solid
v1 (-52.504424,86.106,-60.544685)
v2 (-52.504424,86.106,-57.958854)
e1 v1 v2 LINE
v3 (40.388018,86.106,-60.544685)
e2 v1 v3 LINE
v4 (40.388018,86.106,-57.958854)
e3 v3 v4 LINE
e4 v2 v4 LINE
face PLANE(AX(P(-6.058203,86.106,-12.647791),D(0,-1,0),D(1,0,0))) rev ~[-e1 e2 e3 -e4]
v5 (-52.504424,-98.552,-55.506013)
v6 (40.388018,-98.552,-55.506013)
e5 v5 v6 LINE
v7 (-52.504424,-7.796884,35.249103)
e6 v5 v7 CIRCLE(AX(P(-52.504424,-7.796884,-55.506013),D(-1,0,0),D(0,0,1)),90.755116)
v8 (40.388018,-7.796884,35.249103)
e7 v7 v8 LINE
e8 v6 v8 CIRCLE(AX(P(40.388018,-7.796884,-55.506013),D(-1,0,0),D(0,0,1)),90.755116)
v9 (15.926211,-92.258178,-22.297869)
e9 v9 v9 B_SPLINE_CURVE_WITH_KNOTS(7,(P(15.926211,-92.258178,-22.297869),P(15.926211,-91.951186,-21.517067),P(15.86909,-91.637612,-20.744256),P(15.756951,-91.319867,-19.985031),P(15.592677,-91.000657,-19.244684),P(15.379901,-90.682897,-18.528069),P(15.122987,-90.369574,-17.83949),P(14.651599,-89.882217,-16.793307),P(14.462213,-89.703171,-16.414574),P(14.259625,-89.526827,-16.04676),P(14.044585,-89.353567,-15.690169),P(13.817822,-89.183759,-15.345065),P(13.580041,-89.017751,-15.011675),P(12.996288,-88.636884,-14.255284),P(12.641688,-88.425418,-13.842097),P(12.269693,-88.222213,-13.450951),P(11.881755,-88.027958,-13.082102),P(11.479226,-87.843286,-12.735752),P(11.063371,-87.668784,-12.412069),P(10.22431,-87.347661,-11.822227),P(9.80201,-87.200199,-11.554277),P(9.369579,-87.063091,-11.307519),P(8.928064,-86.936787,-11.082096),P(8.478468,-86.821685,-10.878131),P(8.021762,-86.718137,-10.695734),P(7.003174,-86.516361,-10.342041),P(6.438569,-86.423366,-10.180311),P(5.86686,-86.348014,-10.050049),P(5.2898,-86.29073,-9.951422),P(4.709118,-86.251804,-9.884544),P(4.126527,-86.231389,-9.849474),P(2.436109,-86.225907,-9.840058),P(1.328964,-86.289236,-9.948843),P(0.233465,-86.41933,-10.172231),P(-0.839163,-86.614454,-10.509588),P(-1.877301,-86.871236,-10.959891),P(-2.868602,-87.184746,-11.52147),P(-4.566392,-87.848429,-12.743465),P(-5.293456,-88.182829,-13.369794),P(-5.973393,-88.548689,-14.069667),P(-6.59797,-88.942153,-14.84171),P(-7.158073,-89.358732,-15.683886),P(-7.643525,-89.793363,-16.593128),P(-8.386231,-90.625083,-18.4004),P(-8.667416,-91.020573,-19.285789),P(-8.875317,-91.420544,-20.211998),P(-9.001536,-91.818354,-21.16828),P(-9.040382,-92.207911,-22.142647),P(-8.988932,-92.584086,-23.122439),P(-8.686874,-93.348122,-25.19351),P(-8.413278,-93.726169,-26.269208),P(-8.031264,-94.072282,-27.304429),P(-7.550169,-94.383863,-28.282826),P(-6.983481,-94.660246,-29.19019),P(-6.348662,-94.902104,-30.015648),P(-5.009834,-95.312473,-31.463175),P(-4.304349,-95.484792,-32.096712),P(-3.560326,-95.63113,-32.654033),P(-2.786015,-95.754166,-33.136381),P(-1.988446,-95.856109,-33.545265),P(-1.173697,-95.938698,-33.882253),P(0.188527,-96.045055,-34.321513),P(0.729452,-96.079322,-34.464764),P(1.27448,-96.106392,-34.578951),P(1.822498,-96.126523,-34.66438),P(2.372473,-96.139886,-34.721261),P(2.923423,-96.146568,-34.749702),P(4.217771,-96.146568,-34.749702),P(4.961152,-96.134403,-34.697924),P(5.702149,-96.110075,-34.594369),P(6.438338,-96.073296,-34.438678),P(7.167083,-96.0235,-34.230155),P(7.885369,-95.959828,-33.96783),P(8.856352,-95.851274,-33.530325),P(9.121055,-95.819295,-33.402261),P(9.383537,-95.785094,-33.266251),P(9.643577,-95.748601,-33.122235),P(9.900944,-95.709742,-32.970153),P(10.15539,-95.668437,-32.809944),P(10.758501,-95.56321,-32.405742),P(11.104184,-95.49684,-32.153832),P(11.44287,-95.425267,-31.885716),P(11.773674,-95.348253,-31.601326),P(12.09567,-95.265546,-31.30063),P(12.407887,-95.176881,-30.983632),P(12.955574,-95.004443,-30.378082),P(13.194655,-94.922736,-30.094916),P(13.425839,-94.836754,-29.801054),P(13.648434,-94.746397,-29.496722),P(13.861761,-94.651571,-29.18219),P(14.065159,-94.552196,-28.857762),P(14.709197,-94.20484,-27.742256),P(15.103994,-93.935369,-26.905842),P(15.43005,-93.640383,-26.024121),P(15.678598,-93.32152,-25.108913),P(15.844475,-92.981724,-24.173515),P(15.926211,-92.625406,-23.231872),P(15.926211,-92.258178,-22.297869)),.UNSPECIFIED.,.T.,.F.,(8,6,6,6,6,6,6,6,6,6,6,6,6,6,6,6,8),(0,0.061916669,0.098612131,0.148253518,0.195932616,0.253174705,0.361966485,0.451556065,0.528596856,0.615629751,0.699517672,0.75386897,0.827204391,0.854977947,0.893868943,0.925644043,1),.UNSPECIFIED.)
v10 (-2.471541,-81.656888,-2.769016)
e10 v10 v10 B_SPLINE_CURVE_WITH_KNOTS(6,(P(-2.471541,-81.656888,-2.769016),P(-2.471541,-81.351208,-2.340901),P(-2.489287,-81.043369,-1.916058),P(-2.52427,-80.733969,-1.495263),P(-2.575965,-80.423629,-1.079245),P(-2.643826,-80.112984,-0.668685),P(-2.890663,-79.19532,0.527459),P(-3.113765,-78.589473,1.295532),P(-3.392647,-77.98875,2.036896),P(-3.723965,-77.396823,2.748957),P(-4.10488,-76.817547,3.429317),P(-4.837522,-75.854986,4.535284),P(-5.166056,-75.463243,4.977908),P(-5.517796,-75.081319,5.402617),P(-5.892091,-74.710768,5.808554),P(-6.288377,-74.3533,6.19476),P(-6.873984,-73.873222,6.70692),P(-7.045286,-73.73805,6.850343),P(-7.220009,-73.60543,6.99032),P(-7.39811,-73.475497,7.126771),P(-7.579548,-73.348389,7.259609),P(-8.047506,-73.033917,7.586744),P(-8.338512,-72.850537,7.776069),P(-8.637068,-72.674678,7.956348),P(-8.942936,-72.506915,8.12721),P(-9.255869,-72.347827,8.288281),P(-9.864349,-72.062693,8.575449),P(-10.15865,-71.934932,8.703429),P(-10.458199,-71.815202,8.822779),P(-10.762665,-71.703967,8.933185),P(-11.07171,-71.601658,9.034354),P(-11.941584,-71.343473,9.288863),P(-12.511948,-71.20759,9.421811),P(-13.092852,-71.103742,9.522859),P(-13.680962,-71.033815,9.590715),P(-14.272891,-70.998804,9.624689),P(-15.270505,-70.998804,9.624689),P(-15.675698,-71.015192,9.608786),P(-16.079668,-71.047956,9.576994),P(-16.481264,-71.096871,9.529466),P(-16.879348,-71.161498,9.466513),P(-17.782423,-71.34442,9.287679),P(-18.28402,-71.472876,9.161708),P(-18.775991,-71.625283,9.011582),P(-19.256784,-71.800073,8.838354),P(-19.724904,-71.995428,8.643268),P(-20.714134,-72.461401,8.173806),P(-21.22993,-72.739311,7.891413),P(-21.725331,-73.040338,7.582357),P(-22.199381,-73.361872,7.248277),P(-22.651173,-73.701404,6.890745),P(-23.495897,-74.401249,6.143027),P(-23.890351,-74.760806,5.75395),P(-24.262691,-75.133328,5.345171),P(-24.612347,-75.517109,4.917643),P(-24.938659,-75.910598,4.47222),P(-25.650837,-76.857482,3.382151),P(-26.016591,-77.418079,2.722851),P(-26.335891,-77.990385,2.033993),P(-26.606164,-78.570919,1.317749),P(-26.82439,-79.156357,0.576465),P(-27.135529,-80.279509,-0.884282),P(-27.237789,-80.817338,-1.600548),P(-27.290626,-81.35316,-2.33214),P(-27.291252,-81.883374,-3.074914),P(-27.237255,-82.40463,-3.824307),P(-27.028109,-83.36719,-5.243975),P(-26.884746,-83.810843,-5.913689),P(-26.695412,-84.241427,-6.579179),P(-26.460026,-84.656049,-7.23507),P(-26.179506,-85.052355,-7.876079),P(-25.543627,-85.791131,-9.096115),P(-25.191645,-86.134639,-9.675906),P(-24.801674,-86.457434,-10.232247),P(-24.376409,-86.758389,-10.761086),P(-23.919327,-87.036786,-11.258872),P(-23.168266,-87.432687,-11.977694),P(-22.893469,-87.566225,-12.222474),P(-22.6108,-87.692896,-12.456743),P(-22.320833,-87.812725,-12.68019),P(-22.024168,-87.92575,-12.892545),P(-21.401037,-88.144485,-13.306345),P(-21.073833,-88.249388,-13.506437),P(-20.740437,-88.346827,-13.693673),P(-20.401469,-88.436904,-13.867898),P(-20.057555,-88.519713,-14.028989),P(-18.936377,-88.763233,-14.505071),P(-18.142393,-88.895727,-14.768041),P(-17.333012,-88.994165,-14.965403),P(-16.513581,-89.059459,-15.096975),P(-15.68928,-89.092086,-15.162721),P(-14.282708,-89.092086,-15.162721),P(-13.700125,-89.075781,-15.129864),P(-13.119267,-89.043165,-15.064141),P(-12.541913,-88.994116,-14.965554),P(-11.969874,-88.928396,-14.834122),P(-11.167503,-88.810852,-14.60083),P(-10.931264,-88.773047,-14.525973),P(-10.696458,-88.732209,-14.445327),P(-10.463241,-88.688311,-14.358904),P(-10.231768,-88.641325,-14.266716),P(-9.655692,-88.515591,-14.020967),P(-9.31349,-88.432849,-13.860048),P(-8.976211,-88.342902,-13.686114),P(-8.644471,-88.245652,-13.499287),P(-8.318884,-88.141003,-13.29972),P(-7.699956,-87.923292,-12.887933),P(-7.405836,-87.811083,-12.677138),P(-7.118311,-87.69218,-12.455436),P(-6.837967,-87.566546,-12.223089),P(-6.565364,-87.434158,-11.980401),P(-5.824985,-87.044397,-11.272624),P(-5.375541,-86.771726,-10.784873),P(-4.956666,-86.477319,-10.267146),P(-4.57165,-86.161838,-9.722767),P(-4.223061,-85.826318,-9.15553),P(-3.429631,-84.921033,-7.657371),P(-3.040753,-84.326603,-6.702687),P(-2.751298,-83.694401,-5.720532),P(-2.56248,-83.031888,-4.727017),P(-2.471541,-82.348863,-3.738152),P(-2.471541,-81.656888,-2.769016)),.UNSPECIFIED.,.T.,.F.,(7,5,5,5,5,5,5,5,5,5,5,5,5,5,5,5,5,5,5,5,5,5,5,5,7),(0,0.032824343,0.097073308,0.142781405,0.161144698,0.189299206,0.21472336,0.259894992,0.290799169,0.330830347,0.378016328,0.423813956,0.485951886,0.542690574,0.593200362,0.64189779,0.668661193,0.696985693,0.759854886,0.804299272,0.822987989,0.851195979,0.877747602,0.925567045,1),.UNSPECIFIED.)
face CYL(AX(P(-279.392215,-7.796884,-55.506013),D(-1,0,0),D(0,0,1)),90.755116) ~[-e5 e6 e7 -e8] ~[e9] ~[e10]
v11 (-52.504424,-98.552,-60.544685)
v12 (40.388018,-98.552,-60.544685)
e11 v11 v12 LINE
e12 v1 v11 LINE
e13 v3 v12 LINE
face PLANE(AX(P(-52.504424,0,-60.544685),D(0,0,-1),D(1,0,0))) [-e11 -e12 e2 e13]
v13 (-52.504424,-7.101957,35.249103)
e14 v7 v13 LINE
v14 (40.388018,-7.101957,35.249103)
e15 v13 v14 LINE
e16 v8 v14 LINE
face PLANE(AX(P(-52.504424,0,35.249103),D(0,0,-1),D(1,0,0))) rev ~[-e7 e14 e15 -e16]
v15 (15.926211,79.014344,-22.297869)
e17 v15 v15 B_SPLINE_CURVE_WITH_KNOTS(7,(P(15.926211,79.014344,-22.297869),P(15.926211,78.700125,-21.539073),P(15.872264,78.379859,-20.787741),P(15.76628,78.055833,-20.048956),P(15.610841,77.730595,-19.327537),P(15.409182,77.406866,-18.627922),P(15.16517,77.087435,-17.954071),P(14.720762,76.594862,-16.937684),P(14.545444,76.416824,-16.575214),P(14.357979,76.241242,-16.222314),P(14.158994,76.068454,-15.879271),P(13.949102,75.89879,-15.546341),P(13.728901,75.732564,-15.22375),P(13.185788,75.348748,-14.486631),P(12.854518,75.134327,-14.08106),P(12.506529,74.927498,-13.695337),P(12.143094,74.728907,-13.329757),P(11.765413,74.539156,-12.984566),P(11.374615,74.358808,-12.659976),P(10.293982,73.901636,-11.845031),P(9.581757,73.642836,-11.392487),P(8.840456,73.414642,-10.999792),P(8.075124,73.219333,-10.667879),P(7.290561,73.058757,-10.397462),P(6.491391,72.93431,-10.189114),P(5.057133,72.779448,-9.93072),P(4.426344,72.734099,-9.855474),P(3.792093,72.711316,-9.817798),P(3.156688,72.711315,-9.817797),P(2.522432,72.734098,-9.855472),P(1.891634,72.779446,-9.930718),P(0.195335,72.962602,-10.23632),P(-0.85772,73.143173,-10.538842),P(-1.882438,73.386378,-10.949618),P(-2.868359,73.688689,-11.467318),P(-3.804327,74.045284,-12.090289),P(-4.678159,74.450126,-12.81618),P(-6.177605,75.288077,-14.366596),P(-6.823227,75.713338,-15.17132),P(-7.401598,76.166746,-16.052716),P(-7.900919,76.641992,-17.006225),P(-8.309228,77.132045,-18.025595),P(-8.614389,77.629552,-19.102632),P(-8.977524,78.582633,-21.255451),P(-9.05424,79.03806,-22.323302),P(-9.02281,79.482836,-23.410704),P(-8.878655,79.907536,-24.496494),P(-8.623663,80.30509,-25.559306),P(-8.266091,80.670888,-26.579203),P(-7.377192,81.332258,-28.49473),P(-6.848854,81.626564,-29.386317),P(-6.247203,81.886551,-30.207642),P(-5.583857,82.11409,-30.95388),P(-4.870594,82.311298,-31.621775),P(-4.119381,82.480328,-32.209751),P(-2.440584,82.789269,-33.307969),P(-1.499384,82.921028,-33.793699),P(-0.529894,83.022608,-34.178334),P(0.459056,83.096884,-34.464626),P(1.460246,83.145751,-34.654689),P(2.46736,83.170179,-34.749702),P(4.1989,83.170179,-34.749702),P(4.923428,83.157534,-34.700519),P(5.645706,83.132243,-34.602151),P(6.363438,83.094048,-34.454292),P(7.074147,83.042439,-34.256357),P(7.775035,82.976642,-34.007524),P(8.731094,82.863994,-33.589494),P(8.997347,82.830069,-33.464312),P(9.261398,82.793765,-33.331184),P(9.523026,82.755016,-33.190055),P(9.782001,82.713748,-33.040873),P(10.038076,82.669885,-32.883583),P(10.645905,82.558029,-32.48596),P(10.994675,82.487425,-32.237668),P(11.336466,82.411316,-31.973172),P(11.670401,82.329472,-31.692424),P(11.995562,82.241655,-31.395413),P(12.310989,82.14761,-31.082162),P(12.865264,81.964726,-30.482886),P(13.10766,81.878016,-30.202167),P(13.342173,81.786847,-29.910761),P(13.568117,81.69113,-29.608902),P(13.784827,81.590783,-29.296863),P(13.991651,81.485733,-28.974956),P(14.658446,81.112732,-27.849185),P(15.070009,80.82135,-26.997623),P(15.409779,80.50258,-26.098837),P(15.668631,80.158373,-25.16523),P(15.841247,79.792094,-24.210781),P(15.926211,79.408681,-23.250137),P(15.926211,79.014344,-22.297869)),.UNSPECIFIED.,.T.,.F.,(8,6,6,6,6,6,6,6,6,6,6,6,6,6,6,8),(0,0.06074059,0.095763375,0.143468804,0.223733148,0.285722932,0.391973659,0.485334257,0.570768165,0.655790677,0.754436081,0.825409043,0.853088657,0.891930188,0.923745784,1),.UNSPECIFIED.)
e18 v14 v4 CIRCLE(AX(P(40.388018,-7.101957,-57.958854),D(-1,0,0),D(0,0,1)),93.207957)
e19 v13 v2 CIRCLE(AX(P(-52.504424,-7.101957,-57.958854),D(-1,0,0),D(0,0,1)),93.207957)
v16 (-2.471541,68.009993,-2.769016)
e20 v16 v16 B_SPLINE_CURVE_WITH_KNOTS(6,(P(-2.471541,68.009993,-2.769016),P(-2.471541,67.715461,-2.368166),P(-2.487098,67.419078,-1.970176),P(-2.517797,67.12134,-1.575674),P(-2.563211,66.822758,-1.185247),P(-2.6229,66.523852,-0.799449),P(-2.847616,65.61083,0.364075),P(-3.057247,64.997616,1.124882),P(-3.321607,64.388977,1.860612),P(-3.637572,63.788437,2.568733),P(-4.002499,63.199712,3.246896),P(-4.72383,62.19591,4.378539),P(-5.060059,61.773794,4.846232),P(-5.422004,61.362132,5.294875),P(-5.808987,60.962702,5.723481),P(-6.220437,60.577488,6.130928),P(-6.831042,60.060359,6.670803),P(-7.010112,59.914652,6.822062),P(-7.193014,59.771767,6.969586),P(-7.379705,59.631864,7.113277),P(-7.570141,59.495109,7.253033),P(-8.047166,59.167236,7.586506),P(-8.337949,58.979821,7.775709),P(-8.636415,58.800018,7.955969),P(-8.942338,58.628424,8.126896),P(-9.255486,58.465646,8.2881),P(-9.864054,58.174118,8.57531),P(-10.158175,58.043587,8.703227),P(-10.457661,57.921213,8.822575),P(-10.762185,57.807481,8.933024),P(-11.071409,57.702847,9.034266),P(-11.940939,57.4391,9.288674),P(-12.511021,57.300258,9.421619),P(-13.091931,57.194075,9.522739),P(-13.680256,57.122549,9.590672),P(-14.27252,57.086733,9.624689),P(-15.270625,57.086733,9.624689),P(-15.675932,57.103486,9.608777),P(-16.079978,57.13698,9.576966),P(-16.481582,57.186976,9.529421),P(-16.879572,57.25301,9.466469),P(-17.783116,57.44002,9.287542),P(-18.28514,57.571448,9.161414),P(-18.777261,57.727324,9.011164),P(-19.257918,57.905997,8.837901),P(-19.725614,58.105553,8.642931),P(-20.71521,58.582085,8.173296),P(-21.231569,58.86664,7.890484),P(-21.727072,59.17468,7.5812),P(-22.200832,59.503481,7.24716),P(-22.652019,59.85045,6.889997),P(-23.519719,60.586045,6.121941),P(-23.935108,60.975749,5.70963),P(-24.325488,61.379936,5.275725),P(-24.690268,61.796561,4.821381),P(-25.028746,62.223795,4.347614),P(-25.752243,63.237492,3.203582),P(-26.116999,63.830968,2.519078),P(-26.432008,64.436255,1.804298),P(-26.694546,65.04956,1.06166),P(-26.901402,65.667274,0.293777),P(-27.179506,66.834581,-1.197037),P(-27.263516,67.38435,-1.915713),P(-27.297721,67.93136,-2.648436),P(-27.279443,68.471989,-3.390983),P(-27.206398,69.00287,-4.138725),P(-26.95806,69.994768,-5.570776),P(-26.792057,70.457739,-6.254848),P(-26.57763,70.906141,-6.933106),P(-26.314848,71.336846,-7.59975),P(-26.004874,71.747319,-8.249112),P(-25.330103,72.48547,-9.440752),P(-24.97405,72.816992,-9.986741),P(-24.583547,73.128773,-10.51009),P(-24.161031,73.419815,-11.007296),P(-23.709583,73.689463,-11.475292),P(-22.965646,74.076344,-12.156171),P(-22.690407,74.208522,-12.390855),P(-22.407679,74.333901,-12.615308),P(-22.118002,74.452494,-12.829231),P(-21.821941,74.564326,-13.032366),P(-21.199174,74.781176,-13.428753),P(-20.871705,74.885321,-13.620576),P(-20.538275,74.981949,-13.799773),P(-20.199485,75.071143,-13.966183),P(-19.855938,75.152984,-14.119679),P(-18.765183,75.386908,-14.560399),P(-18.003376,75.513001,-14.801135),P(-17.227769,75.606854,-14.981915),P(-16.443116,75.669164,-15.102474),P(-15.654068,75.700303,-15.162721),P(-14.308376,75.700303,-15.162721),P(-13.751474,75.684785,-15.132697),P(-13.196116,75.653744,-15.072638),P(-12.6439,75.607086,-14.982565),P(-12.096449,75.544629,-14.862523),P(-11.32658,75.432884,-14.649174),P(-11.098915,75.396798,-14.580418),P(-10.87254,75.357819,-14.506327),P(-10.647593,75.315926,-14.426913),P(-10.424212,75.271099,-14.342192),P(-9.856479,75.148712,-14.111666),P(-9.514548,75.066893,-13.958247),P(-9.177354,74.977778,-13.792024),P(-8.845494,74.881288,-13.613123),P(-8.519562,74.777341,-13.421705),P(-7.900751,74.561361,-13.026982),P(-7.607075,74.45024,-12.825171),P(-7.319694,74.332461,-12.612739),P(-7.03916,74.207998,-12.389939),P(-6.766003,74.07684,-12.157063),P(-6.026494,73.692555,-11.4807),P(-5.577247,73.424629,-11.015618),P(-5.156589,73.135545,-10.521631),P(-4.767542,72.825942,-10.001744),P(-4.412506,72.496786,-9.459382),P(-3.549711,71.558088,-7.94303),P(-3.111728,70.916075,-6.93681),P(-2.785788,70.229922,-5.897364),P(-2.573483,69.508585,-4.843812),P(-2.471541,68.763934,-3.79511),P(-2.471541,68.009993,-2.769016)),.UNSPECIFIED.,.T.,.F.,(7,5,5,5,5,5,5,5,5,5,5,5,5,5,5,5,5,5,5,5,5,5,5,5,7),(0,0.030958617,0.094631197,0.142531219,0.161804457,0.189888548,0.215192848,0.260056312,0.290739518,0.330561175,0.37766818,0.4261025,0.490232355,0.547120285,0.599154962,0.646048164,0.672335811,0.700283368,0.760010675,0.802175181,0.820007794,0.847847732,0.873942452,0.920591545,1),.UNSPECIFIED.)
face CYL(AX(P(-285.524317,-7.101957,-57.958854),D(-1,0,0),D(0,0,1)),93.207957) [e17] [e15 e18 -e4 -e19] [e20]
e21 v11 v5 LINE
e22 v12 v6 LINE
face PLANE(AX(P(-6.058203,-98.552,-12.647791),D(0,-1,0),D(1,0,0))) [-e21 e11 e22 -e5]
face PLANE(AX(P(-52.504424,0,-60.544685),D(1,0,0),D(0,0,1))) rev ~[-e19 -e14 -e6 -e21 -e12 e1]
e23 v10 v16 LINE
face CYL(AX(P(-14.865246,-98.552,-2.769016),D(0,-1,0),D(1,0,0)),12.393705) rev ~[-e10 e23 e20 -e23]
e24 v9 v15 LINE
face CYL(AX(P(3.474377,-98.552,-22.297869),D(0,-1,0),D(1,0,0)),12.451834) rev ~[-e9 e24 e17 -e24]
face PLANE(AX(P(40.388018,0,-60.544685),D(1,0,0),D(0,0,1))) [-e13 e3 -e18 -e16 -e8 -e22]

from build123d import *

# Parameters (mm, degrees)
F0_W        = 92.8924418986
F0_H        = 95.79378739
F1_DEPTH    = 98.552
F2_DEPTH    = 86.106
F3_R        = 12.3937050542
F4_DEPTH    = 203.2
F5_R        = 12.4518339151
F6_DEPTH    = 203.2
F7_T1_DEPTH = 546.6680230822
F8_T1_DEPTH = 558.9322279791


# Not quite as in the source:
# - a fillet or chamfer that OpenCascade refuses, or shapes differently, is made with other operations: its cross-section is extruded or revolved along the edge and cut away or added


with BuildPart() as f1:
    # F0 (on Front) → F1 (new body)
    with BuildSketch(Plane.XZ):
        with Locations((-6.0582030565, -12.6477908343)):
            Rectangle(F0_W, F0_H)
    extrude(amount=F1_DEPTH)

    # F2 (add): a face of the model
    f2_faces = [f1.faces().sort_by_distance(p)[0] for p in [
        (-6.0582030565, 0, -12.6477908343),
    ]]
    extrude(f2_faces, amount=F2_DEPTH)

    # F3 (on face) → F4 (cut)
    with BuildSketch(Plane.XZ.offset(98.552)):
        with Locations((-14.8652456701, -2.7690164279)):
            Circle(F3_R)
    extrude(amount=-F4_DEPTH, mode=Mode.SUBTRACT)

    # F5 (on face) → F6 (cut)
    with BuildSketch(Plane.XZ.offset(98.552)):
        with Locations((3.47437663, -22.2978685051)):
            Circle(F5_R)
    extrude(amount=-F6_DEPTH, mode=Mode.SUBTRACT)

    # F7: fillet of radius 90.7551162367 on 1 edges, made by hand

    # F7_s2 → F7_t1 (cut)
    with BuildSketch(Plane.YZ.offset(-279.3922145976)):
        with BuildLine():
            ThreePointArc((-7.7968837633, 35.2491028607), (-71.9704418816, 8.6675447423), (-98.552, -55.506013376))
            Line((-98.552, -55.506013376), (-98.552, 35.2491028607))
            Line((-98.552, 35.2491028607), (-7.7968837633, 35.2491028607))
        make_face()
    extrude(amount=F7_T1_DEPTH, mode=Mode.SUBTRACT)

    # F8: fillet of radius 93.2079572161 on 1 edges, made by hand

    # F8_s2 → F8_t1 (cut)
    with BuildSketch(Plane.YZ.offset(-285.524317046)):
        with BuildLine():
            ThreePointArc((-7.1019572161, 35.2491028607), (58.8060213919, 7.9491242526), (86.106, -57.9588543554))
            Line((86.106, -57.9588543554), (86.106, 35.2491028607))
            Line((86.106, 35.2491028607), (-7.1019572161, 35.2491028607))
        make_face()
    extrude(amount=F8_T1_DEPTH, mode=Mode.SUBTRACT)


solid = f1.part
